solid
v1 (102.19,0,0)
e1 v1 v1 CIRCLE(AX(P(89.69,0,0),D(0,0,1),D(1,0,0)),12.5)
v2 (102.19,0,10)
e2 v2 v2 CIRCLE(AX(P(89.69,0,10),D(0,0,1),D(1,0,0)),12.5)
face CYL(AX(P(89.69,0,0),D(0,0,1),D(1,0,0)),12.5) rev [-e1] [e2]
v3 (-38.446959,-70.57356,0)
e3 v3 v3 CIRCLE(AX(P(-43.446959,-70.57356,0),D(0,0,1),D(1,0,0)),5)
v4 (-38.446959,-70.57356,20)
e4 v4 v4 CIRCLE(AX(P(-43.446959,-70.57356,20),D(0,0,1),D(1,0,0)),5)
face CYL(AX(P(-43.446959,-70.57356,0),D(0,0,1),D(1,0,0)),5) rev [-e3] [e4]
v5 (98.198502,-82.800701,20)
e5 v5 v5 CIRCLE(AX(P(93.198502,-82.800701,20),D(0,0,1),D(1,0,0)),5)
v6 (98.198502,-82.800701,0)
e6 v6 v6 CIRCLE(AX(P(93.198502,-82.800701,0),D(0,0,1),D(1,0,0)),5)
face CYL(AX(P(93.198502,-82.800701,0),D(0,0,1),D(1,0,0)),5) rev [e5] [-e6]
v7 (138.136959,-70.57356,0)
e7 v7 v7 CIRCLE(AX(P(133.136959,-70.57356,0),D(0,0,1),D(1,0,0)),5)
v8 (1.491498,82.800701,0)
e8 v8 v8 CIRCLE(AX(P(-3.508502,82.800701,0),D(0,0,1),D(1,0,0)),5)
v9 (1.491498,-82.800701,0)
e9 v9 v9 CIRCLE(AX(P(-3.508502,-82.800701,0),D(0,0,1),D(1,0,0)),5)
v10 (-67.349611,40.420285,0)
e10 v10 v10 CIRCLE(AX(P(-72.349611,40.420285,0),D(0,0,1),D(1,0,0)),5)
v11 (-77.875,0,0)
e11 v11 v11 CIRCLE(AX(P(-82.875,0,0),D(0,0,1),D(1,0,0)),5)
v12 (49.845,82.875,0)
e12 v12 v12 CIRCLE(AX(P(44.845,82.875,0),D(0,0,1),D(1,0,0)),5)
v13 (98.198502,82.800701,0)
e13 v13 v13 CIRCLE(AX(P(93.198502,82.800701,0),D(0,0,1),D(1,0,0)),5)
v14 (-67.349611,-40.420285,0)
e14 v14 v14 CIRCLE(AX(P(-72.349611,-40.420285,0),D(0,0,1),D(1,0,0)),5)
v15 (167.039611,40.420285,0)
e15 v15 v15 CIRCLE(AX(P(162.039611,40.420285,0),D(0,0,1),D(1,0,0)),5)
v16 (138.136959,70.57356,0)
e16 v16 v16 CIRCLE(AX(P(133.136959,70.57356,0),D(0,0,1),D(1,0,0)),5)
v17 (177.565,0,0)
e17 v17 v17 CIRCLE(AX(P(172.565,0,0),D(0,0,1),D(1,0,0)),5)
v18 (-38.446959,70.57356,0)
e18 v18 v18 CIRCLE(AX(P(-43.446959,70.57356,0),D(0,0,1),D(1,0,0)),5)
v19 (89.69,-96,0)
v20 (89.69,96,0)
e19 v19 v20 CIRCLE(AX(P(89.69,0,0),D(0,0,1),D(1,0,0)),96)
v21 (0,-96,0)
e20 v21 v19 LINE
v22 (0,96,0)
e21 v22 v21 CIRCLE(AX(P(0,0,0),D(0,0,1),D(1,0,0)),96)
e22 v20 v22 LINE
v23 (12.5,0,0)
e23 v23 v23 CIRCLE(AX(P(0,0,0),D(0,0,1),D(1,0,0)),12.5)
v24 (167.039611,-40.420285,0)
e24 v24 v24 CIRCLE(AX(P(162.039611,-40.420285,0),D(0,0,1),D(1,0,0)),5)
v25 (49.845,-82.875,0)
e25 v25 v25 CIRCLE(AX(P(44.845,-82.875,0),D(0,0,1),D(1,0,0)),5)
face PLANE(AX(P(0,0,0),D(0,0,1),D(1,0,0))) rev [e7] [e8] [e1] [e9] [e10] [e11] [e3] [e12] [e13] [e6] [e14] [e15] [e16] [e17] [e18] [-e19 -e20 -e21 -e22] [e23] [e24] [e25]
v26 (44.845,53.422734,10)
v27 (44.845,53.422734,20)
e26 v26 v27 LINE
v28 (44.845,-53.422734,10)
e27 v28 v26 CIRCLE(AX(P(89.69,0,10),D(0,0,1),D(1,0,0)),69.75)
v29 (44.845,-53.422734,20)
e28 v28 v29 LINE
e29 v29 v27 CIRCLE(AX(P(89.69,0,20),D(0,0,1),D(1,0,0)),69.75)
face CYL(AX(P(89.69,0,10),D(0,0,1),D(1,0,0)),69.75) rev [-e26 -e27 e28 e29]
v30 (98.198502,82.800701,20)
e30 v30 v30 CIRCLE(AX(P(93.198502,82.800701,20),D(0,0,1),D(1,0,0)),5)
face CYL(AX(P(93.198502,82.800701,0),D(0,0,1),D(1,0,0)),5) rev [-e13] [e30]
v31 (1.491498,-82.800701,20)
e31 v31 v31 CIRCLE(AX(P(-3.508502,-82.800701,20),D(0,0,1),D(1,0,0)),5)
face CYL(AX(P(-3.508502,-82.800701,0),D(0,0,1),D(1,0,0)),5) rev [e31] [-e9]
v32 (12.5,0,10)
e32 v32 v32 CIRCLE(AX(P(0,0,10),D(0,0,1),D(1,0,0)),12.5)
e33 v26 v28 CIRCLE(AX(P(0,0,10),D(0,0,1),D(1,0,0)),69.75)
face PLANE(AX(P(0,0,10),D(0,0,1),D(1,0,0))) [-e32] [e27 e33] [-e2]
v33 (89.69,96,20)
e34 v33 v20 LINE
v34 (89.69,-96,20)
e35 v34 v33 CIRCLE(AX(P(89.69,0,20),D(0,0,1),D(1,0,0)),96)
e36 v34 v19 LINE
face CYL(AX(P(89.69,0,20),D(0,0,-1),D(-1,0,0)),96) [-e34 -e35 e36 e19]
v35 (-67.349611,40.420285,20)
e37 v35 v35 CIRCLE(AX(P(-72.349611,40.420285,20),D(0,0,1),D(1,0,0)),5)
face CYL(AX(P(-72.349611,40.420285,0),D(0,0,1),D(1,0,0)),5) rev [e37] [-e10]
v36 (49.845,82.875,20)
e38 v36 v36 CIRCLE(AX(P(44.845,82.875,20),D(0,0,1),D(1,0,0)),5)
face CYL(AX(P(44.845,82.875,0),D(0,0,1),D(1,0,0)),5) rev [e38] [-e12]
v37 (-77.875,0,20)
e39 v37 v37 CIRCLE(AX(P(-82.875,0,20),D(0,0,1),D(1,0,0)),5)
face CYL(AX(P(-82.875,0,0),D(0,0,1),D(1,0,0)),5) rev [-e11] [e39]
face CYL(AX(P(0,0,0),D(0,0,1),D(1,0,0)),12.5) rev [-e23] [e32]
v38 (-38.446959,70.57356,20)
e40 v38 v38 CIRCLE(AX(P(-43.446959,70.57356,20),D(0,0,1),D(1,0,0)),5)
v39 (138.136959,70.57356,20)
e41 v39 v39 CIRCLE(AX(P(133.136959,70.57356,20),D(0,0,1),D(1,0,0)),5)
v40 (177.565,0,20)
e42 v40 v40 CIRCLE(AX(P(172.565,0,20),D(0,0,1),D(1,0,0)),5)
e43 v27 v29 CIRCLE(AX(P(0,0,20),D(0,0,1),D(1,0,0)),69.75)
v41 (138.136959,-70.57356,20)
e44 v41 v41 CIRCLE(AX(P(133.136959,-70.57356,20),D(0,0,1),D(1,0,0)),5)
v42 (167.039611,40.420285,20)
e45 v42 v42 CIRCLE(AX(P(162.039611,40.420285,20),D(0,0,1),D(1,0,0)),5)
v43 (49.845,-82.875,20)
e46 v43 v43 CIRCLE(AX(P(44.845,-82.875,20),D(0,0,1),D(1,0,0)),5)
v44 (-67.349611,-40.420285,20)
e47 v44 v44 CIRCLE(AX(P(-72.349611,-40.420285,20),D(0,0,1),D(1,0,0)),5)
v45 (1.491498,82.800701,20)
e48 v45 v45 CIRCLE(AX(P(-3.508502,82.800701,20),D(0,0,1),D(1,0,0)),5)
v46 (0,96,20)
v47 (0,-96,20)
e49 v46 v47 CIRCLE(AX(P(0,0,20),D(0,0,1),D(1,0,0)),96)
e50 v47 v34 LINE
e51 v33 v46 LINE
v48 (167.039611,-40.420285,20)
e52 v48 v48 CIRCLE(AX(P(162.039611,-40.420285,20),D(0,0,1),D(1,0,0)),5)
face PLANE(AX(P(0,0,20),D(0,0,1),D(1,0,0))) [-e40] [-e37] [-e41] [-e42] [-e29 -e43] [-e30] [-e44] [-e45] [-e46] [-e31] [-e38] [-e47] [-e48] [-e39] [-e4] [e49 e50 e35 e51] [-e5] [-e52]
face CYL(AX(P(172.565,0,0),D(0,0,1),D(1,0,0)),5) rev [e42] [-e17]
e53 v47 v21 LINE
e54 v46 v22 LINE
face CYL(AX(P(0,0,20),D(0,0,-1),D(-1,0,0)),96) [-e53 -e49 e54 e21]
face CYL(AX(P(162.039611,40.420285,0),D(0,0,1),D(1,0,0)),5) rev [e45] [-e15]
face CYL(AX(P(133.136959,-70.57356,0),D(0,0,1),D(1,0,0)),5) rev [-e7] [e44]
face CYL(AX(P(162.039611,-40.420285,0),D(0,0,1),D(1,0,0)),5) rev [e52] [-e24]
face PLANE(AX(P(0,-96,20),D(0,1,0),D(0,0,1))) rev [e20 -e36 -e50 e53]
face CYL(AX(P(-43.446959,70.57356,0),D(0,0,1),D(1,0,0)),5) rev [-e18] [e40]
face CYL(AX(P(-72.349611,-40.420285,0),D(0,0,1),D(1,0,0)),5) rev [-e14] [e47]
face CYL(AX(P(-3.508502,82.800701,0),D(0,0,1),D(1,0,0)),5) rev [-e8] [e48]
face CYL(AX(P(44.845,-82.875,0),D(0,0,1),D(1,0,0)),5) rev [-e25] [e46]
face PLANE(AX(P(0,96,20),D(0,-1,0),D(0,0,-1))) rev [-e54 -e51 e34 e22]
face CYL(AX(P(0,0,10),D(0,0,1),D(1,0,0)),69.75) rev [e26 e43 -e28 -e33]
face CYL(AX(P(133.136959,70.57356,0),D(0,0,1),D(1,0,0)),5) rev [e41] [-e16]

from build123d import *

# Parameters (mm, degrees)
BOSS_EXTRUDE1_DEPTH   = 20
SKETCH2_R             = 69.75
CUT_EXTRUDE1_DEPTH    = 10
SKETCH3_R             = 12.5
CUT_EXTRUDE2_DEPTH    = 210.276793028
SKETCH4_R             = 5
CUT_EXTRUDE3_DEPTH    = 210.992323907
CRVPATTERN2_OUTLINE_R = 5
CRVPATTERN2_DEPTH     = 20


# Read off the part's stored shape, not the designer's step: CrvPattern2
with BuildPart() as part:
    # Sketch1 → Boss-Extrude1 (new body)
    with BuildSketch(Plane.XY):
        with BuildLine():
            Line((0, 96), (89.69, 96))
            ThreePointArc((89.69, 96), (185.69, 0), (89.69, -96))
            Line((89.69, -96), (0, -96))
            ThreePointArc((0, -96), (-96, 0), (0, 96))
        make_face()
    extrude(amount=BOSS_EXTRUDE1_DEPTH)

    # Sketch2 → Cut-Extrude1 (cut)
    with BuildSketch(Plane.XY.offset(20)):
        with Locations((89.69, 0)):
            Circle(SKETCH2_R)
        Circle(SKETCH2_R)
    extrude(amount=-CUT_EXTRUDE1_DEPTH, mode=Mode.SUBTRACT)

    # Sketch3 → Cut-Extrude2 (cut, through all)
    with BuildSketch(Plane.XY.offset(10)):
        Circle(SKETCH3_R)
        with Locations((89.69, 0)):
            Circle(SKETCH3_R)
    extrude(amount=-CUT_EXTRUDE2_DEPTH, mode=Mode.SUBTRACT)

    # Sketch4 → Cut-Extrude3 (cut, through all)
    with BuildSketch(Plane.XY.offset(20)):
        with Locations((172.565, 0)):
            Circle(SKETCH4_R)
    extrude(amount=-CUT_EXTRUDE3_DEPTH, mode=Mode.SUBTRACT)

    # CrvPattern2 outline → CrvPattern2 (cut)
    with BuildSketch(Plane.XY):
        with Locations((162.039610622, 40.420285352)):
            Circle(CRVPATTERN2_OUTLINE_R)
        with Locations((162.039610622, -40.420285352)):
            Circle(CRVPATTERN2_OUTLINE_R)
        with Locations((133.136958542, -70.573560335)):
            Circle(CRVPATTERN2_OUTLINE_R)
        with Locations((93.198501794, -82.800700723)):
            Circle(CRVPATTERN2_OUTLINE_R)
        with Locations((44.845, -82.875)):
            Circle(CRVPATTERN2_OUTLINE_R)
        with Locations((-3.508501794, -82.800700723)):
            Circle(CRVPATTERN2_OUTLINE_R)
        with Locations((-43.446958542, -70.573560335)):
            Circle(CRVPATTERN2_OUTLINE_R)
        with Locations((-72.349610622, -40.420285352)):
            Circle(CRVPATTERN2_OUTLINE_R)
        with Locations((-82.875, 0)):
            Circle(CRVPATTERN2_OUTLINE_R)
        with Locations((-72.349610622, 40.420285352)):
            Circle(CRVPATTERN2_OUTLINE_R)
        with Locations((-43.446958542, 70.573560335)):
            Circle(CRVPATTERN2_OUTLINE_R)
        with Locations((-3.508501794, 82.800700723)):
            Circle(CRVPATTERN2_OUTLINE_R)
        with Locations((44.845, 82.875)):
            Circle(CRVPATTERN2_OUTLINE_R)
        with Locations((93.198501794, 82.800700723)):
            Circle(CRVPATTERN2_OUTLINE_R)
        with Locations((133.136958542, 70.573560335)):
            Circle(CRVPATTERN2_OUTLINE_R)
    extrude(amount=CRVPATTERN2_DEPTH, mode=Mode.SUBTRACT)


solid = part.part
